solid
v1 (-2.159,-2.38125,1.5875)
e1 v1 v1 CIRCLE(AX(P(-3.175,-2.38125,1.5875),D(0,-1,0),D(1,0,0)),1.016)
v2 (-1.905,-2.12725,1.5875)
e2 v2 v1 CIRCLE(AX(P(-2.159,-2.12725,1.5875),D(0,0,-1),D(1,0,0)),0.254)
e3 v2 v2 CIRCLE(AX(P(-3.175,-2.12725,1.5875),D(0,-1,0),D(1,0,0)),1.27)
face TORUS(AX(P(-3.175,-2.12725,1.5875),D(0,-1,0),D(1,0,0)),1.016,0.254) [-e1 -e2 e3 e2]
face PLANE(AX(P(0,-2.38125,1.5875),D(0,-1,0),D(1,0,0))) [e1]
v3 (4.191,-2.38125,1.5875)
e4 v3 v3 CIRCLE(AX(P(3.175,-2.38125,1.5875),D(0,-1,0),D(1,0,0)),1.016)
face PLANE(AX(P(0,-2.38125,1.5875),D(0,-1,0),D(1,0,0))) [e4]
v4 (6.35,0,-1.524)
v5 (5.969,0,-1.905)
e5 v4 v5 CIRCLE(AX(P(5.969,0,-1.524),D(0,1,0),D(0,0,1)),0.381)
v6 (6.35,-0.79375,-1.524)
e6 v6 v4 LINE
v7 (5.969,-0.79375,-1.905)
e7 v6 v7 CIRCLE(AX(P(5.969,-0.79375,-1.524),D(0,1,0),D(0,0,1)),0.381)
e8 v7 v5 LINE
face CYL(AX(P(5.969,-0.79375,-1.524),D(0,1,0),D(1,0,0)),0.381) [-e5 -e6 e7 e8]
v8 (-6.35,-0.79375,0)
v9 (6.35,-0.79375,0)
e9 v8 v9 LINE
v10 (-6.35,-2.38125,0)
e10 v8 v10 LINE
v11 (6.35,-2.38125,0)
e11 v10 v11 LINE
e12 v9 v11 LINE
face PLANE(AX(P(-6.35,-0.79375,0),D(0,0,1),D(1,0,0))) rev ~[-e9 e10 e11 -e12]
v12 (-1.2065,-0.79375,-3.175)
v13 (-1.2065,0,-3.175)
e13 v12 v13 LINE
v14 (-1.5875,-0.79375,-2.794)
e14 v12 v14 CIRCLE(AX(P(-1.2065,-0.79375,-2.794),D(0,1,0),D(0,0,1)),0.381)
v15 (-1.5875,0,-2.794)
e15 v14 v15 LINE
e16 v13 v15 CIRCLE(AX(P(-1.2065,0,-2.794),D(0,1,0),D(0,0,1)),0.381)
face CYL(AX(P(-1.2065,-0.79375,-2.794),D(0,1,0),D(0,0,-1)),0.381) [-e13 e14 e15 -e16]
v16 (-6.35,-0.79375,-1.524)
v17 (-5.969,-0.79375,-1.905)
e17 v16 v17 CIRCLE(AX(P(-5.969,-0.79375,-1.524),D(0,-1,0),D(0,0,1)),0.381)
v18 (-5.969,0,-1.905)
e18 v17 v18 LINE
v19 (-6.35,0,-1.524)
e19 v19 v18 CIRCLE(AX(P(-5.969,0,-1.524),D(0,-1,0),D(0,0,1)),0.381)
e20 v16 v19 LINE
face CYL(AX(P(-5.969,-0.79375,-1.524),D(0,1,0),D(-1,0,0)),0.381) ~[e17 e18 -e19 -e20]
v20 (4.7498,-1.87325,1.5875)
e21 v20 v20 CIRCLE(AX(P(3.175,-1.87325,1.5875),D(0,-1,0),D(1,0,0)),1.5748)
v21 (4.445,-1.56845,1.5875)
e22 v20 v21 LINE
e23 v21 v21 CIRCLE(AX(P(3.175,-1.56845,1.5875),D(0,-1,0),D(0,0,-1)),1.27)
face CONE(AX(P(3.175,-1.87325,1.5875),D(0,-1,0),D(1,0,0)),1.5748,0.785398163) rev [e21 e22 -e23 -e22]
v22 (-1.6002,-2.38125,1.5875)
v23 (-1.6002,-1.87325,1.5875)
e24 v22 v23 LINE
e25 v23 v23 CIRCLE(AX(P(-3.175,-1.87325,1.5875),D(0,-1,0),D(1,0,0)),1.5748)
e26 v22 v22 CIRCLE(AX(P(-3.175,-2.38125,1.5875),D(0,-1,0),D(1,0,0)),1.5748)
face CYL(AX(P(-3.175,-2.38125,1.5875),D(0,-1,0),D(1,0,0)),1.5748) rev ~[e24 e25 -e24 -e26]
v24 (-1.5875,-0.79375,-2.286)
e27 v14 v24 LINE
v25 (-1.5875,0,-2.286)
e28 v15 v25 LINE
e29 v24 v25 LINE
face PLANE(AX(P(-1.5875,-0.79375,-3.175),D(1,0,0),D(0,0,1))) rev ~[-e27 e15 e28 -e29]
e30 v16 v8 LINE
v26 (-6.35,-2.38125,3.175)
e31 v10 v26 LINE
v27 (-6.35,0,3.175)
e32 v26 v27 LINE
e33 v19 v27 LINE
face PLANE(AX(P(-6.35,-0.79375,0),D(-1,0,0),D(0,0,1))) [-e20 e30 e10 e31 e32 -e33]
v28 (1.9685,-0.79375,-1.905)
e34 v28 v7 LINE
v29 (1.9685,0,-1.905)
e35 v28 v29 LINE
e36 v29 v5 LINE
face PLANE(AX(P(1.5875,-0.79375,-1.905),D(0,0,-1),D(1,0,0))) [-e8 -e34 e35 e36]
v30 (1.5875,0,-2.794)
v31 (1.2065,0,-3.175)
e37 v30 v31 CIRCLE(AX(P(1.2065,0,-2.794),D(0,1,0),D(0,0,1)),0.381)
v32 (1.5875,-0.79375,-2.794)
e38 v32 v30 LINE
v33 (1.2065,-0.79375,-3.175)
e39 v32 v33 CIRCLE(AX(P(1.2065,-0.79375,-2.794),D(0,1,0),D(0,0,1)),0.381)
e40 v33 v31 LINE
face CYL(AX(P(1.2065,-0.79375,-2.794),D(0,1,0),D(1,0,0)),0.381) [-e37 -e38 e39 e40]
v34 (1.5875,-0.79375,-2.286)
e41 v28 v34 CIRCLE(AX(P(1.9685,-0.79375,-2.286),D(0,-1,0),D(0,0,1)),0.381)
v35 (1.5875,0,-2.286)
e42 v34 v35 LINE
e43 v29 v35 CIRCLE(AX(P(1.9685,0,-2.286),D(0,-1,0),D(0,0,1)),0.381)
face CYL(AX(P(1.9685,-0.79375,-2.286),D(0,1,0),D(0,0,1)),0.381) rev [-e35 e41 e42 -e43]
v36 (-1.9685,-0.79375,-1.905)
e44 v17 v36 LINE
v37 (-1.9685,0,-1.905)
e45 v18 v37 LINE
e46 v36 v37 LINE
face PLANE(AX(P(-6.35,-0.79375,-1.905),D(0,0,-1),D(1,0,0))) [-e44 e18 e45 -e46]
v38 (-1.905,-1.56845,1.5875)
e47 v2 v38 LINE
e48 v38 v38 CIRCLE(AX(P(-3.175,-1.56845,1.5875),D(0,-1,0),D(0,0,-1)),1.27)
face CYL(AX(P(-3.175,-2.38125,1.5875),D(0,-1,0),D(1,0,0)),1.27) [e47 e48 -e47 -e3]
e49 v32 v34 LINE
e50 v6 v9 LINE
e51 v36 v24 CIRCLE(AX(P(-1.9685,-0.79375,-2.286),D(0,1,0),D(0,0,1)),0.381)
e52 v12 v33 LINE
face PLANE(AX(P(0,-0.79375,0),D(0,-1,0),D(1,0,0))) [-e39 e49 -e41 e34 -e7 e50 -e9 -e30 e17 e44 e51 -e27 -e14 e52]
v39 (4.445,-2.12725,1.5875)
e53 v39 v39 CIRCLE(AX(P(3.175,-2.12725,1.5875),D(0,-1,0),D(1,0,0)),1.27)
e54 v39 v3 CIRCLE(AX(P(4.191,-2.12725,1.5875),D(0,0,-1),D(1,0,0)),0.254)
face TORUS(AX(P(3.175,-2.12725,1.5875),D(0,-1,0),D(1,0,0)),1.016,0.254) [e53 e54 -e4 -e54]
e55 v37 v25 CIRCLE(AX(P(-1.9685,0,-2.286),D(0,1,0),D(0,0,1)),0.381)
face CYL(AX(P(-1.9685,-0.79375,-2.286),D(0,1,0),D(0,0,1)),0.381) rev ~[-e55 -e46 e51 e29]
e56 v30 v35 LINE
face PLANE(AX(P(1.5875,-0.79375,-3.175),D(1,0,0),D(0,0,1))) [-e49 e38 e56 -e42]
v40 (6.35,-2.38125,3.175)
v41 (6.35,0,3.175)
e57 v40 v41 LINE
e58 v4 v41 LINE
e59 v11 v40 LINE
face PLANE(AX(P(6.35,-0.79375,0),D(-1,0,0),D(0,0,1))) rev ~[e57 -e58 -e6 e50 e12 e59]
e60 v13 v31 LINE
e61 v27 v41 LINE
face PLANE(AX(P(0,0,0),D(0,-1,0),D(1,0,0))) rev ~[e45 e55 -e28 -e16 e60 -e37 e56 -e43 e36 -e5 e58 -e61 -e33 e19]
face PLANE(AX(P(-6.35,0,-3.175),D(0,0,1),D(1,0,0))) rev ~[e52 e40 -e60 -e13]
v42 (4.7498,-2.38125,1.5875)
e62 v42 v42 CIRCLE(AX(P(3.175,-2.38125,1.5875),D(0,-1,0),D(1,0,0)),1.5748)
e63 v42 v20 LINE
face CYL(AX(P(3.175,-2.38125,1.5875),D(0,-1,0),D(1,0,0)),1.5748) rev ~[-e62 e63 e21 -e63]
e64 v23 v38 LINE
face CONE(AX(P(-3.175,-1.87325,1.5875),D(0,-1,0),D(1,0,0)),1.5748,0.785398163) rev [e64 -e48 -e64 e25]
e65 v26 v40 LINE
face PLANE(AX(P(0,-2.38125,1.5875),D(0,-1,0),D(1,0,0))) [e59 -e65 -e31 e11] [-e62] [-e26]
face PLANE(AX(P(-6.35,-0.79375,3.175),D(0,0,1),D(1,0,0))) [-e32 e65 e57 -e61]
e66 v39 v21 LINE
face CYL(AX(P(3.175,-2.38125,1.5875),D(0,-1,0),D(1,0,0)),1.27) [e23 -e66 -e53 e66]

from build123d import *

# Parameters (mm, degrees)
F0_W     = 12.7
F0_H     = 6.35
F1_DEPTH = 0.79375
F2_W     = 4.7625
F2_H     = 1.27
F3_DEPTH = 25.4
F4_R     = 0.381
F2_W_2   = 12.7
F2_H_2   = 3.175
F5_DEPTH = 1.5875
F6_R     = 1.5748
F6_R_2   = 1.27
F7_DEPTH = 0.889
F9_R     = 0.254


# Not quite as in the source:
# - a fillet or chamfer that OpenCascade refuses, or shapes differently, is made with other operations: its cross-section is extruded or revolved along the edge and cut away or added


with BuildPart() as f1:
    # F0 (on Front) → F1 (new body)
    with BuildSketch(Plane.XZ):
        Rectangle(F0_W, F0_H)
    extrude(amount=F1_DEPTH)

    # F2 (on face) → F3 (cut)
    with BuildSketch(Plane.XZ.offset(0.79375)):
        with Locations((-3.96875, -2.54)):
            Rectangle(F2_W, F2_H)
        with Locations((3.96875, -2.54)):
            Rectangle(F2_W, F2_H)
    extrude(amount=-F3_DEPTH, mode=Mode.SUBTRACT)

    # F4
    f4_edges = [f1.edges().sort_by_distance(p)[0] for p in [
        (-1.5875, -0.396875, -3.175),
        (1.5875, -0.396875, -3.175),
        (-6.35, -0.396875, -1.905),
        (6.35, -0.396875, -1.905),
        (1.5875, -0.396875, -1.905),
        (-1.5875, -0.396875, -1.905),
    ]]
    fillet(f4_edges, radius=F4_R)

    # F2 (on face) → F5 (join)
    with BuildSketch(Plane.XZ.offset(0.79375)):
        with Locations((0, 1.5875)):
            Rectangle(F2_W_2, F2_H_2)
    extrude(amount=F5_DEPTH)

    # F6 (on face) → F7 (cut)
    with BuildSketch(Plane.XZ.offset(2.38125)):
        with Locations((-3.175, 1.5875)):
            Circle(F6_R)
        with Locations((-3.175, 1.5875)):
            Circle(F6_R_2, mode=Mode.SUBTRACT)
        with Locations((3.175, 1.5875)):
            Circle(F6_R)
        with Locations((3.175, 1.5875)):
            Circle(F6_R_2, mode=Mode.SUBTRACT)
    extrude(amount=-F7_DEPTH, mode=Mode.SUBTRACT)

    # F8: chamfer of 0.381 on 2 edges, made by hand

    # F8_s1 → F8_t2 (revolve)
    with BuildSketch(Plane.XY.offset(1.5875)):
        Polygon((-1.6002, -1.87325), (-1.9812, -1.49225), (-1.6002, -1.49225), align=None)
    revolve(axis=Axis((-3.175, -1.49225, 1.5875), (0, -1, 0)))

    # F8_s3 → F8_t4 (revolve)
    with BuildSketch(Plane.XY.offset(1.5875)):
        Polygon((4.7498, -1.87325), (4.3688, -1.49225), (4.7498, -1.49225), align=None)
    revolve(axis=Axis((3.175, -1.49225, 1.5875), (0, -1, 0)))

    # F9
    f9_edges = [f1.edges().sort_by_distance(p)[0] for p in [
        (-4.445, -2.38125, 1.5875),
        (1.905, -2.38125, 1.5875),
    ]]
    fillet(f9_edges, radius=F9_R)


solid = f1.part
